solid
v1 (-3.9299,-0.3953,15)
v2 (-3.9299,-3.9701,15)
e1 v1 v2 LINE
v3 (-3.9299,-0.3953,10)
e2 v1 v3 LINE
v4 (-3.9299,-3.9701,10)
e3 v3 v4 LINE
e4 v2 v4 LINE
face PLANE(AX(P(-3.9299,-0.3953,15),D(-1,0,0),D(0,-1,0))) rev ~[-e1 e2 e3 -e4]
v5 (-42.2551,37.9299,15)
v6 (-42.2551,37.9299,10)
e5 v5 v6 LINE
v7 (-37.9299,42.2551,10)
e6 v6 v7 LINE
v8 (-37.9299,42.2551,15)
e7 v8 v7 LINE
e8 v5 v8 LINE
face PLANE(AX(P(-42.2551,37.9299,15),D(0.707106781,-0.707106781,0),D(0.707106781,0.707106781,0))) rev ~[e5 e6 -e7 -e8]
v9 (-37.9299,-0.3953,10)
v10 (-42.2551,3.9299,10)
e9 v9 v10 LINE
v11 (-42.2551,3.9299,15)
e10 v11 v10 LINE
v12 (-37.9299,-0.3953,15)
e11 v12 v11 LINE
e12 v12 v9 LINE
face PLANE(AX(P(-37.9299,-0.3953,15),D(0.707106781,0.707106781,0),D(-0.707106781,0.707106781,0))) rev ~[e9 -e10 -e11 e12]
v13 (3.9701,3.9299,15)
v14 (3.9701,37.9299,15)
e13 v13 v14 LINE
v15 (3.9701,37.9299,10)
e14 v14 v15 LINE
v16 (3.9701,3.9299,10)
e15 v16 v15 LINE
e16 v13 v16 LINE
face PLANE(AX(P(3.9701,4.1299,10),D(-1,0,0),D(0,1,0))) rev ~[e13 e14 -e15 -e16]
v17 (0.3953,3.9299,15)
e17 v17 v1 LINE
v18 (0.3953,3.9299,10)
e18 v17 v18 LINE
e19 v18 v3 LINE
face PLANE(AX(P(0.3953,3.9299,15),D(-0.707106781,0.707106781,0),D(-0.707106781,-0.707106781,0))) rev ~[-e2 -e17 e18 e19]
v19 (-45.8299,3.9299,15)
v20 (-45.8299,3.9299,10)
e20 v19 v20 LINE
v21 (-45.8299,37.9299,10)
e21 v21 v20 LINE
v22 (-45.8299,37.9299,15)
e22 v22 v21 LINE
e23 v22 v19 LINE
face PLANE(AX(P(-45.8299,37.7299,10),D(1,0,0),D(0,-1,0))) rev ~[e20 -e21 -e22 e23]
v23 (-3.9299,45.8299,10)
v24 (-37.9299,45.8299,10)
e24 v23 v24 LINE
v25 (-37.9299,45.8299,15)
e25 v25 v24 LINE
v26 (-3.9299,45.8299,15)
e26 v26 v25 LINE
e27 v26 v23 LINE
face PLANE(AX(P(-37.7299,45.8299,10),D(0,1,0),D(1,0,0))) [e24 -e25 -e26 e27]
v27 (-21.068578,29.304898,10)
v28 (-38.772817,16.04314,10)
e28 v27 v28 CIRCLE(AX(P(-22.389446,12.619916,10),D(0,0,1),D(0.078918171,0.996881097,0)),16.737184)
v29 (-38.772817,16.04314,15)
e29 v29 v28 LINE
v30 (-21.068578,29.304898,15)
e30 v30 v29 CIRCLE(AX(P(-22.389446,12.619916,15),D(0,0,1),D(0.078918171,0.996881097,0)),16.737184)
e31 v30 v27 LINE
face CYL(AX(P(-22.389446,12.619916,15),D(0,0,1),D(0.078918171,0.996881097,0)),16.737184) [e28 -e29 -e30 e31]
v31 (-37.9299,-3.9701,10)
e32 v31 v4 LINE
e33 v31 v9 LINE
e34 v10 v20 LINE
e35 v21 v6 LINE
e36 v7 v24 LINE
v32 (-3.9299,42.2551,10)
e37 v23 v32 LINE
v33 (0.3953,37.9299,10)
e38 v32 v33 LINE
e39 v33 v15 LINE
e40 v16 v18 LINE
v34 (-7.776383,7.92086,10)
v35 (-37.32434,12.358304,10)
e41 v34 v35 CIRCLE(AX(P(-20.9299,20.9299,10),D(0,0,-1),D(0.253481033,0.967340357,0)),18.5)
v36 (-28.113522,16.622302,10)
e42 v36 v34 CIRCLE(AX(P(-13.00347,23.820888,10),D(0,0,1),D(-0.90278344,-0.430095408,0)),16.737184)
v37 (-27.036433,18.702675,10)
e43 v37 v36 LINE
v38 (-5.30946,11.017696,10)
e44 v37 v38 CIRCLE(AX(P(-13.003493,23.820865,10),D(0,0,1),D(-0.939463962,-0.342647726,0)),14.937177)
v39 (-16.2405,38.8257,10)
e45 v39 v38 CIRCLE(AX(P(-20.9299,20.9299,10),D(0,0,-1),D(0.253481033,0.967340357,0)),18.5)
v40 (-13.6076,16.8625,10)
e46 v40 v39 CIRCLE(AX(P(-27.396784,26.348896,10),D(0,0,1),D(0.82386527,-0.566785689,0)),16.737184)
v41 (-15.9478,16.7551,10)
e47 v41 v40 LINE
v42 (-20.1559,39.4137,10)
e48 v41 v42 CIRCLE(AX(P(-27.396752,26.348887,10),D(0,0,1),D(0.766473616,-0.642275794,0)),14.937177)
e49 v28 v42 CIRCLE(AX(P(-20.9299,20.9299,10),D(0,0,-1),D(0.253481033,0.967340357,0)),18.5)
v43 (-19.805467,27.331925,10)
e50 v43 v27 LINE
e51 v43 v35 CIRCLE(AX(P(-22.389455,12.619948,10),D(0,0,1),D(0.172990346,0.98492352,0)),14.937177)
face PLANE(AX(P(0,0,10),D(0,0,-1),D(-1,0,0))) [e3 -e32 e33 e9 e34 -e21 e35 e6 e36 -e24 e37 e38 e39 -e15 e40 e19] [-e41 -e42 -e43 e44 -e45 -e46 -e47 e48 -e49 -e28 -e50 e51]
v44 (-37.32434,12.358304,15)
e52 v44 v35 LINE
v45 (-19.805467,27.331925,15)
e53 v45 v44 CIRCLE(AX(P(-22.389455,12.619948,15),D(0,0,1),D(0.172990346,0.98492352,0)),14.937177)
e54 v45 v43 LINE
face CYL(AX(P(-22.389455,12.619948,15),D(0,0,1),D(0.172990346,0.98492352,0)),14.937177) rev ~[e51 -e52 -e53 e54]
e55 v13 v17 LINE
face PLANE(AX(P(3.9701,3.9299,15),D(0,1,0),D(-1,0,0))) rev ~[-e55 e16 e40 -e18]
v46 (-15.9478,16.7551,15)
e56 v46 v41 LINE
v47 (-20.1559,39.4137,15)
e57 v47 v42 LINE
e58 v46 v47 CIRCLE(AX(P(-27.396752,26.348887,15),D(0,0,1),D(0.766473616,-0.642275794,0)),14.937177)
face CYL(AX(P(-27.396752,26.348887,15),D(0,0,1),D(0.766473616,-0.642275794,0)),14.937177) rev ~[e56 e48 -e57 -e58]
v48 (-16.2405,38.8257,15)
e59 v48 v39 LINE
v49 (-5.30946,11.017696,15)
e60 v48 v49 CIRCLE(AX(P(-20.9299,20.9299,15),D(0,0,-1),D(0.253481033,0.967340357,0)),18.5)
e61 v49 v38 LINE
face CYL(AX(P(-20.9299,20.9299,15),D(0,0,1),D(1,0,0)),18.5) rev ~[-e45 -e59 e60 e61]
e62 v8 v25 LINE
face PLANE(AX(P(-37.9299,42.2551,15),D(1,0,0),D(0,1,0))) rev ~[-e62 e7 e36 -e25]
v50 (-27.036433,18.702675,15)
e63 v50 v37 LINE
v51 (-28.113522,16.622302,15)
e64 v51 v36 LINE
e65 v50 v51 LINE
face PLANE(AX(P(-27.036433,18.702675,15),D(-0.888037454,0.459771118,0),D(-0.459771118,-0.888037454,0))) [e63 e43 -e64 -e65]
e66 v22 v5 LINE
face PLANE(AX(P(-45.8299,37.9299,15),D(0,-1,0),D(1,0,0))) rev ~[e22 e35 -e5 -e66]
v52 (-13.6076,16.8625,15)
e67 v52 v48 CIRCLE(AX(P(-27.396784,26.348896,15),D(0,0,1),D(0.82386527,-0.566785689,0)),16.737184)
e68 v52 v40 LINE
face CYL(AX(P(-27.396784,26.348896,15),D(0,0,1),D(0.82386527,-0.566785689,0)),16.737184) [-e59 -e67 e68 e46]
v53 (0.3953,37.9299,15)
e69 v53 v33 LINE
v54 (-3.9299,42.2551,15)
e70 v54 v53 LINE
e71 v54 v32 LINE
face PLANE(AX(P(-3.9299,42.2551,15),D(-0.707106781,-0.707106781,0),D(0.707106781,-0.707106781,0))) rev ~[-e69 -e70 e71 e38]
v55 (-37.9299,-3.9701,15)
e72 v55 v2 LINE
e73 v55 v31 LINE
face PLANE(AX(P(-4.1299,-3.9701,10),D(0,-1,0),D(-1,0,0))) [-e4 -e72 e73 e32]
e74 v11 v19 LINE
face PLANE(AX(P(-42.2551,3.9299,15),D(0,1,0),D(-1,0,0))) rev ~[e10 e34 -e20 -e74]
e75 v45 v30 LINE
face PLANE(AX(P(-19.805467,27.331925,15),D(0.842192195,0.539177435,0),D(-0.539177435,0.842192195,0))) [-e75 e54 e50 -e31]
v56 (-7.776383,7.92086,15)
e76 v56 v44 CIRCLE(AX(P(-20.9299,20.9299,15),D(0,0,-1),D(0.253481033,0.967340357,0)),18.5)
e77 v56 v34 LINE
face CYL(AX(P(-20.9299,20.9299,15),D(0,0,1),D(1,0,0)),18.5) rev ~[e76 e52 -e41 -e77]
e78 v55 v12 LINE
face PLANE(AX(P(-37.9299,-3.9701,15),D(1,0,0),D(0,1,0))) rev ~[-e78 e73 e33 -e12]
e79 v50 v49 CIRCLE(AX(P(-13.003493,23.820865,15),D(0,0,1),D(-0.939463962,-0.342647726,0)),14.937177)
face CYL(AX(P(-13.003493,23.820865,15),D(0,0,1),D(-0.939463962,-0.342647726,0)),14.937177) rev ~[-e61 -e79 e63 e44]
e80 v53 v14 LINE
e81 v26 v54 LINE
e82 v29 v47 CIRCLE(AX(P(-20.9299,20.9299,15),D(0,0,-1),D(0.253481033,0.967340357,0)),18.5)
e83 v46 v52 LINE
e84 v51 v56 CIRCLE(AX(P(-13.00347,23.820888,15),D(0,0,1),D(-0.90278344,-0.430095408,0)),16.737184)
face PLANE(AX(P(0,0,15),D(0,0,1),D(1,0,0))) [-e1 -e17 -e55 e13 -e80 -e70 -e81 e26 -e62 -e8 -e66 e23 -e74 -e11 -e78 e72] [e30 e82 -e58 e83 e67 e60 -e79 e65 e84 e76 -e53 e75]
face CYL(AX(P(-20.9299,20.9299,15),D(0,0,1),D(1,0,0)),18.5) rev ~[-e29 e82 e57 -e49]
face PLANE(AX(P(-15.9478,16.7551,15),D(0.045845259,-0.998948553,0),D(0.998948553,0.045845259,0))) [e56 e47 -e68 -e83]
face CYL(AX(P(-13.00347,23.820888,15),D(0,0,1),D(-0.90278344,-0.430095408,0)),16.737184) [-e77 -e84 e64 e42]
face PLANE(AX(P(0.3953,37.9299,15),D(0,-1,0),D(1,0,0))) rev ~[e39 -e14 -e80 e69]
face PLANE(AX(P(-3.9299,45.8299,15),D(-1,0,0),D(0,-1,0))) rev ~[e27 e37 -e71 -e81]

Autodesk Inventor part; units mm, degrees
ref_plane "YZ Plane" through (0, 0, 0) normal (1, 0, 0) x (0, 1, 0)
ref_plane "Work Plane1" through (0, 0, 10) normal (0, 0, 1) x (1, 0, 0)
sketch "Sketch1" plane through (0, 0, 10) normal (0, 0, 1) x (1, 0, 0)
  line L0 (-4.0299, -0.3538) -> (-2.2322, 1.4439) construction
  arc A0 (-1.4439, 2.2322) -> (-2.2322, 1.4439) centre (-0.9299, 0.9299) ccw construction
  line L1 (-1.4439, 2.2322) -> (0.3538, 4.0299) construction
  line L2 (-37.8299, 42.2137) -> (-37.8299, 45.8299) construction
  line L3 (-37.8299, 45.8299) -> (-4.0299, 45.8299) construction
  line L4 (-4.0299, 45.8299) -> (-4.0299, 42.2137) construction
  line L5 (-4.0299, 4.0299) -> (0.3538, 4.0299) projected
  line L6 (-20.9299, 58.9723) -> (17.1124, 20.9299) construction
  line L7 (17.1124, 20.9299) -> (-20.9299, -17.1124) construction
  line L8 (-20.9299, -17.1124) -> (-58.9723, 20.9299) construction
  line L9 (-58.9723, 20.9299) -> (-20.9299, 58.9723) construction
  line L10 (-20.9299, 58.9723) -> (-20.9299, -17.1124) construction
  line L11 (17.1124, 20.9299) -> (-58.9723, 20.9299) construction
  line L12 (-20.9299, 58.9723) -> (32.8701, 58.9723) construction
  line L13 (-43.4299, 43.4299) -> (1.5701, 43.4299) construction
  line L14 (1.5701, 43.4299) -> (1.5701, -1.5701) construction
  line L15 (1.5701, -1.5701) -> (-43.4299, -1.5701) construction
  line L16 (-43.4299, -1.5701) -> (-43.4299, 43.4299) construction
  line L17 (-43.4299, 43.4299) -> (1.5701, -1.5701) construction
  line L18 (1.5701, 43.4299) -> (-43.4299, -1.5701) construction
  line L19 (-43.4299, 5.3876) -> (-43.4299, 36.4723)
  line L20 (-43.4299, 36.4723) -> (-36.4723, 43.4299)
  line L21 (-36.4723, 43.4299) -> (-5.3876, 43.4299)
  line L22 (-5.3876, 43.4299) -> (1.5701, 36.4723)
  line L23 (1.5701, 36.4723) -> (1.5701, 5.3876)
  line L24 (1.5701, 5.3876) -> (-5.3876, -1.5701)
  line L25 (-5.3876, -1.5701) -> (-36.4723, -1.5701)
  line L26 (-36.4723, -1.5701) -> (-43.4299, 5.3876)
  line L27 (-4.0299, 42.2137) -> (-37.8299, 42.2137) projected
  line L28 (-4.0299, -0.3538) -> (-4.0299, 4.0299) projected
  circle A1 centre (-20.9299, 20.9299) radius 13.3985
  circle A2 centre (-20.9299, 20.9299) radius 15.4895
  point P0 (-37.8299, 4.0299)
  dimension "d18" = 53.8
  dimension "d19" = 45
  dimension "d20" = 53.8
  dimension "d21" = 45
  dimension "d22" = 45
  dimension "d30" = 26.797
  dimension "d36" = 30.979
extrude "Extrusion1" add sketch "Sketch1" along normal blind 5 contours L28 L24 L25 L26 L19 L20 L27 L22 L23 L5 | L5 L24 L28 | L27 L20 L21 L22 | A1 | A2
ref_plane "Work Plane2" through (-40.9959, 0.8639, 22.2359) normal (0, 0, 1) x (1, 0, 0)
sketch "Sketch3" plane through (0, 0, 10) normal (0, 0, -1) x (-1, 0, 0)
  line L0 (37.8299, -0.4701) -> (37.8299, 4.0299) construction
  line L1 (4.0299, 4.0299) -> (4.0299, -0.4701) construction
  line L2 (37.8299, -0.4701) -> (37.8299, 1.1886) construction
  line L3 (4.0299, -3.9701) -> (4.0299, -0.3538) construction
  line L4 (45.8299, 4.0299) -> (42.2137, 4.0299) construction
  line L5 (-0.3538, 4.0299) -> (-3.9701, 4.0299) construction
  line L6 (-3.9701, 37.8299) -> (-0.3538, 37.8299) construction
  line L7 (4.0299, 42.2137) -> (4.0299, 45.8299) construction
  line L8 (37.8299, 45.8299) -> (37.8299, 42.2137) construction
  line L9 (42.2137, 37.8299) -> (45.8299, 37.8299) construction
  line L10 (37.8299, 37.7299) -> (45.8299, 37.7299)
  line L11 (45.8299, 37.7299) -> (45.8299, 4.1299)
  line L12 (45.8299, 4.1299) -> (37.8299, 4.1299)
  line L13 (37.8299, 4.1299) -> (37.8299, 37.7299)
  line L14 (37.7299, 4.0299) -> (4.1299, 4.0299)
  line L15 (4.1299, 4.0299) -> (4.1299, -3.9701)
  line L16 (4.1299, -3.9701) -> (37.7299, -3.9701)
  line L17 (37.7299, -3.9701) -> (37.7299, 4.0299)
  line L18 (4.0299, 4.1299) -> (-3.9701, 4.1299)
  line L19 (-3.9701, 4.1299) -> (-3.9701, 37.7299)
  line L20 (-3.9701, 37.7299) -> (4.0299, 37.7299)
  line L21 (4.0299, 37.7299) -> (4.0299, 4.1299)
  line L22 (4.1299, 37.8299) -> (37.7299, 37.8299)
  line L23 (37.7299, 37.8299) -> (37.7299, 45.8299)
  line L24 (37.7299, 45.8299) -> (4.1299, 45.8299)
  line L25 (4.1299, 45.8299) -> (4.1299, 37.8299)
  point P0 (0, 0)
  dimension "d23" = 0.1
  dimension "d24" = 0.1
  dimension "d25" = 0.1
  dimension "d26" = 0.1
  dimension "d27" = 0.1
extrude "Extrusion3" add sketch "Sketch3" against normal up to surface (5 mm away)
sketch "Sketch6" plane through (0, 0, 15) normal (0, 0, 1) x (1, 0, 0)
  circle A0 centre (-20.9299, 20.9299) radius 18.5
  circle A1 centre (-20.9299, 20.9299) radius 13.3985
  line L0 (-45.8299, 4.1299) -> (-45.8299, 37.7299) projected
  line L1 (-4.1299, -3.9701) -> (-37.7299, -3.9701) projected
  line L2 (-37.7299, 45.8299) -> (-4.1299, 45.8299) projected
  point P0 (0, 0)
  point P1 (-45.8299, 20.9299)
  point P2 (-20.9299, -3.9701)
  point P3 (-20.9299, 45.8299)
  dimension "d37" = 26.797
  dimension "d38" = 37
extrude "Extrusion5" cut sketch "Sketch6" against normal blind 12 contours A0 | A1
sketch "Sketch7" plane through (0, 0, 15) normal (0, 0, 1) x (1, 0, 0)
  arc A0 (-7.3514, 4.1907) -> (-4.1915, 7.0829) centre (-15.9478, 16.7551) ccw
  arc A1 (-7.3514, 4.1907) -> (-4.1915, 7.0829) centre (-15.9478, 16.7551) ccw
  circle A2 centre (-20.9299, 20.9299) radius 18.5 construction
  circle A3 centre (-20.9299, 20.9299) radius 6.5 construction
  arc A4 (-15.9478, 16.7551) -> (-20.1559, 39.4137) centre (-27.3968, 26.3489) ccw
  arc A5 (-13.6076, 16.8625) -> (-16.2405, 38.8257) centre (-27.3968, 26.3489) ccw
  arc A6 (-16.2405, 38.8257) -> (-20.1559, 39.4137) centre (-20.9299, 20.9299) ccw
  line L0 (-15.9478, 16.7551) -> (-13.6076, 16.8625)
  point P0 (0, 0)
  point P1 (-25.3654, 35.7708)
  point P2 (-14.2, -44.8454)
  point P3 (-13.5804, 16.4347)
  point P4 (-13.5804, 8.5029)
  dimension "d79" = 13
  dimension "d83" = 1.8
extrude "Extrusion6" add sketch "Sketch7" against normal up to surface (5 mm away)
pattern_circular "Circular Pattern1" count 3 over 360 about axis through (-20.9299, 20.9299, 15) along (0, 0, -1) of "Extrusion6"
sketch "Skizze11" plane through (0, 0, 15) normal (0, 0, 1) x (1, 0, 0)
  arc A0 (-5.3095, 11.0177) -> (-16.2405, 38.8257) centre (-20.9299, 20.9299) ccw construction
  arc A1 (-27.0364, 18.7027) -> (-5.3095, 11.0177) centre (-13.0035, 23.8209) ccw construction
  line L0 (-28.1135, 16.6223) -> (-27.0364, 18.7027) construction
  arc A2 (-28.1135, 16.6223) -> (-7.7764, 7.9209) centre (-13.0035, 23.8209) ccw construction
  arc A3 (-37.3244, 12.3584) -> (-7.7764, 7.9209) centre (-20.9299, 20.9299) ccw construction
  arc A4 (-19.8055, 27.3319) -> (-37.3244, 12.3584) centre (-22.3895, 12.6199) ccw construction
  line L1 (-21.0686, 29.3049) -> (-19.8055, 27.3319) construction
  arc A5 (-21.0686, 29.3049) -> (-38.7728, 16.0432) centre (-22.3895, 12.6199) ccw construction
  arc A6 (-20.1559, 39.4137) -> (-38.7728, 16.0432) centre (-20.9299, 20.9299) ccw construction
  arc A7 (-15.9478, 16.7551) -> (-20.1559, 39.4137) centre (-27.3968, 26.3489) ccw construction
  line L2 (-13.6076, 16.8625) -> (-15.9478, 16.7551) construction
  arc A8 (-13.6076, 16.8625) -> (-16.2405, 38.8257) centre (-27.3968, 26.3489) ccw construction
  line L3 (3.9701, 4.1299) -> (0.3124, 4.1299) projected
  line L4 (3.9701, 37.7299) -> (3.9701, 4.1299) construction
  line L5 (0.3124, 37.7299) -> (3.9701, 37.7299) projected
  line L6 (0.3124, 37.7299) -> (-4.1299, 42.1723) projected
  line L7 (-4.1299, 45.8299) -> (-4.1299, 42.1723) projected
  line L8 (-37.7299, 45.8299) -> (-4.1299, 45.8299) construction
  line L9 (-37.7299, 42.1723) -> (-37.7299, 45.8299) projected
  line L10 (-37.7299, 42.1723) -> (-42.1723, 37.7299) projected
  line L11 (-45.8299, 37.7299) -> (-42.1723, 37.7299) projected
  line L12 (-45.8299, 4.1299) -> (-45.8299, 37.7299) construction
  line L13 (-42.1723, 4.1299) -> (-45.8299, 4.1299) projected
  line L14 (-42.1723, 4.1299) -> (-37.7299, -0.3124) projected
  line L15 (-37.7299, -3.9701) -> (-37.7299, -0.3124) projected
  line L16 (-4.1299, -3.9701) -> (-37.7299, -3.9701) construction
  line L17 (-4.1299, -0.3124) -> (-4.1299, -3.9701) projected
  line L18 (-4.1299, -0.3124) -> (0.3124, 4.1299) projected
  line L19 (-3.9299, 46.0299) -> (-3.9299, 42.2551)
  line L20 (-3.9299, 42.2551) -> (0.3953, 37.9299)
  line L21 (0.3953, 37.9299) -> (4.1701, 37.9299)
  line L22 (4.1701, 37.9299) -> (4.1701, 3.9299) construction
  line L23 (4.1701, 3.9299) -> (0.3953, 3.9299)
  line L24 (0.3953, 3.9299) -> (-3.9299, -0.3953)
  line L25 (-3.9299, -0.3953) -> (-3.9299, -4.1701)
  line L26 (-3.9299, -4.1701) -> (-37.9299, -4.1701) construction
  line L27 (-37.9299, -4.1701) -> (-37.9299, -0.3953)
  line L28 (-37.9299, -0.3953) -> (-42.2551, 3.9299)
  line L29 (-42.2551, 3.9299) -> (-46.0299, 3.9299)
  line L30 (-46.0299, 3.9299) -> (-46.0299, 37.9299) construction
  line L31 (-46.0299, 37.9299) -> (-42.2551, 37.9299)
  line L32 (-42.2551, 37.9299) -> (-37.9299, 42.2551)
  line L33 (-37.9299, 42.2551) -> (-37.9299, 46.0299)
  line L34 (-37.9299, 46.0299) -> (-3.9299, 46.0299) construction
  line L35 (-45.8299, 37.7299) -> (-45.8299, 37.9299)
  line L36 (-37.7299, 45.8299) -> (-37.9299, 45.8299)
  line L37 (-4.1299, 45.8299) -> (-3.9299, 45.8299)
  line L38 (3.9701, 37.7299) -> (3.9701, 37.9299)
  line L39 (3.9701, 37.7299) -> (3.9701, 4.1299) projected
  line L40 (3.9701, 4.1299) -> (3.9701, 3.9299)
  line L41 (-4.1299, -3.9701) -> (-3.9299, -3.9701)
  line L42 (-37.7299, -3.9701) -> (-37.9299, -3.9701)
  line L43 (-45.8299, 4.1299) -> (-45.8299, 3.9299)
  point P0 (0, 0)
  dimension "d84" = 0.2
extrude "IM_offset" add sketch "Skizze11" against normal up to surface (5 mm away)
properties part number "20_Cube_Insert_Objective_Holder_v3"
